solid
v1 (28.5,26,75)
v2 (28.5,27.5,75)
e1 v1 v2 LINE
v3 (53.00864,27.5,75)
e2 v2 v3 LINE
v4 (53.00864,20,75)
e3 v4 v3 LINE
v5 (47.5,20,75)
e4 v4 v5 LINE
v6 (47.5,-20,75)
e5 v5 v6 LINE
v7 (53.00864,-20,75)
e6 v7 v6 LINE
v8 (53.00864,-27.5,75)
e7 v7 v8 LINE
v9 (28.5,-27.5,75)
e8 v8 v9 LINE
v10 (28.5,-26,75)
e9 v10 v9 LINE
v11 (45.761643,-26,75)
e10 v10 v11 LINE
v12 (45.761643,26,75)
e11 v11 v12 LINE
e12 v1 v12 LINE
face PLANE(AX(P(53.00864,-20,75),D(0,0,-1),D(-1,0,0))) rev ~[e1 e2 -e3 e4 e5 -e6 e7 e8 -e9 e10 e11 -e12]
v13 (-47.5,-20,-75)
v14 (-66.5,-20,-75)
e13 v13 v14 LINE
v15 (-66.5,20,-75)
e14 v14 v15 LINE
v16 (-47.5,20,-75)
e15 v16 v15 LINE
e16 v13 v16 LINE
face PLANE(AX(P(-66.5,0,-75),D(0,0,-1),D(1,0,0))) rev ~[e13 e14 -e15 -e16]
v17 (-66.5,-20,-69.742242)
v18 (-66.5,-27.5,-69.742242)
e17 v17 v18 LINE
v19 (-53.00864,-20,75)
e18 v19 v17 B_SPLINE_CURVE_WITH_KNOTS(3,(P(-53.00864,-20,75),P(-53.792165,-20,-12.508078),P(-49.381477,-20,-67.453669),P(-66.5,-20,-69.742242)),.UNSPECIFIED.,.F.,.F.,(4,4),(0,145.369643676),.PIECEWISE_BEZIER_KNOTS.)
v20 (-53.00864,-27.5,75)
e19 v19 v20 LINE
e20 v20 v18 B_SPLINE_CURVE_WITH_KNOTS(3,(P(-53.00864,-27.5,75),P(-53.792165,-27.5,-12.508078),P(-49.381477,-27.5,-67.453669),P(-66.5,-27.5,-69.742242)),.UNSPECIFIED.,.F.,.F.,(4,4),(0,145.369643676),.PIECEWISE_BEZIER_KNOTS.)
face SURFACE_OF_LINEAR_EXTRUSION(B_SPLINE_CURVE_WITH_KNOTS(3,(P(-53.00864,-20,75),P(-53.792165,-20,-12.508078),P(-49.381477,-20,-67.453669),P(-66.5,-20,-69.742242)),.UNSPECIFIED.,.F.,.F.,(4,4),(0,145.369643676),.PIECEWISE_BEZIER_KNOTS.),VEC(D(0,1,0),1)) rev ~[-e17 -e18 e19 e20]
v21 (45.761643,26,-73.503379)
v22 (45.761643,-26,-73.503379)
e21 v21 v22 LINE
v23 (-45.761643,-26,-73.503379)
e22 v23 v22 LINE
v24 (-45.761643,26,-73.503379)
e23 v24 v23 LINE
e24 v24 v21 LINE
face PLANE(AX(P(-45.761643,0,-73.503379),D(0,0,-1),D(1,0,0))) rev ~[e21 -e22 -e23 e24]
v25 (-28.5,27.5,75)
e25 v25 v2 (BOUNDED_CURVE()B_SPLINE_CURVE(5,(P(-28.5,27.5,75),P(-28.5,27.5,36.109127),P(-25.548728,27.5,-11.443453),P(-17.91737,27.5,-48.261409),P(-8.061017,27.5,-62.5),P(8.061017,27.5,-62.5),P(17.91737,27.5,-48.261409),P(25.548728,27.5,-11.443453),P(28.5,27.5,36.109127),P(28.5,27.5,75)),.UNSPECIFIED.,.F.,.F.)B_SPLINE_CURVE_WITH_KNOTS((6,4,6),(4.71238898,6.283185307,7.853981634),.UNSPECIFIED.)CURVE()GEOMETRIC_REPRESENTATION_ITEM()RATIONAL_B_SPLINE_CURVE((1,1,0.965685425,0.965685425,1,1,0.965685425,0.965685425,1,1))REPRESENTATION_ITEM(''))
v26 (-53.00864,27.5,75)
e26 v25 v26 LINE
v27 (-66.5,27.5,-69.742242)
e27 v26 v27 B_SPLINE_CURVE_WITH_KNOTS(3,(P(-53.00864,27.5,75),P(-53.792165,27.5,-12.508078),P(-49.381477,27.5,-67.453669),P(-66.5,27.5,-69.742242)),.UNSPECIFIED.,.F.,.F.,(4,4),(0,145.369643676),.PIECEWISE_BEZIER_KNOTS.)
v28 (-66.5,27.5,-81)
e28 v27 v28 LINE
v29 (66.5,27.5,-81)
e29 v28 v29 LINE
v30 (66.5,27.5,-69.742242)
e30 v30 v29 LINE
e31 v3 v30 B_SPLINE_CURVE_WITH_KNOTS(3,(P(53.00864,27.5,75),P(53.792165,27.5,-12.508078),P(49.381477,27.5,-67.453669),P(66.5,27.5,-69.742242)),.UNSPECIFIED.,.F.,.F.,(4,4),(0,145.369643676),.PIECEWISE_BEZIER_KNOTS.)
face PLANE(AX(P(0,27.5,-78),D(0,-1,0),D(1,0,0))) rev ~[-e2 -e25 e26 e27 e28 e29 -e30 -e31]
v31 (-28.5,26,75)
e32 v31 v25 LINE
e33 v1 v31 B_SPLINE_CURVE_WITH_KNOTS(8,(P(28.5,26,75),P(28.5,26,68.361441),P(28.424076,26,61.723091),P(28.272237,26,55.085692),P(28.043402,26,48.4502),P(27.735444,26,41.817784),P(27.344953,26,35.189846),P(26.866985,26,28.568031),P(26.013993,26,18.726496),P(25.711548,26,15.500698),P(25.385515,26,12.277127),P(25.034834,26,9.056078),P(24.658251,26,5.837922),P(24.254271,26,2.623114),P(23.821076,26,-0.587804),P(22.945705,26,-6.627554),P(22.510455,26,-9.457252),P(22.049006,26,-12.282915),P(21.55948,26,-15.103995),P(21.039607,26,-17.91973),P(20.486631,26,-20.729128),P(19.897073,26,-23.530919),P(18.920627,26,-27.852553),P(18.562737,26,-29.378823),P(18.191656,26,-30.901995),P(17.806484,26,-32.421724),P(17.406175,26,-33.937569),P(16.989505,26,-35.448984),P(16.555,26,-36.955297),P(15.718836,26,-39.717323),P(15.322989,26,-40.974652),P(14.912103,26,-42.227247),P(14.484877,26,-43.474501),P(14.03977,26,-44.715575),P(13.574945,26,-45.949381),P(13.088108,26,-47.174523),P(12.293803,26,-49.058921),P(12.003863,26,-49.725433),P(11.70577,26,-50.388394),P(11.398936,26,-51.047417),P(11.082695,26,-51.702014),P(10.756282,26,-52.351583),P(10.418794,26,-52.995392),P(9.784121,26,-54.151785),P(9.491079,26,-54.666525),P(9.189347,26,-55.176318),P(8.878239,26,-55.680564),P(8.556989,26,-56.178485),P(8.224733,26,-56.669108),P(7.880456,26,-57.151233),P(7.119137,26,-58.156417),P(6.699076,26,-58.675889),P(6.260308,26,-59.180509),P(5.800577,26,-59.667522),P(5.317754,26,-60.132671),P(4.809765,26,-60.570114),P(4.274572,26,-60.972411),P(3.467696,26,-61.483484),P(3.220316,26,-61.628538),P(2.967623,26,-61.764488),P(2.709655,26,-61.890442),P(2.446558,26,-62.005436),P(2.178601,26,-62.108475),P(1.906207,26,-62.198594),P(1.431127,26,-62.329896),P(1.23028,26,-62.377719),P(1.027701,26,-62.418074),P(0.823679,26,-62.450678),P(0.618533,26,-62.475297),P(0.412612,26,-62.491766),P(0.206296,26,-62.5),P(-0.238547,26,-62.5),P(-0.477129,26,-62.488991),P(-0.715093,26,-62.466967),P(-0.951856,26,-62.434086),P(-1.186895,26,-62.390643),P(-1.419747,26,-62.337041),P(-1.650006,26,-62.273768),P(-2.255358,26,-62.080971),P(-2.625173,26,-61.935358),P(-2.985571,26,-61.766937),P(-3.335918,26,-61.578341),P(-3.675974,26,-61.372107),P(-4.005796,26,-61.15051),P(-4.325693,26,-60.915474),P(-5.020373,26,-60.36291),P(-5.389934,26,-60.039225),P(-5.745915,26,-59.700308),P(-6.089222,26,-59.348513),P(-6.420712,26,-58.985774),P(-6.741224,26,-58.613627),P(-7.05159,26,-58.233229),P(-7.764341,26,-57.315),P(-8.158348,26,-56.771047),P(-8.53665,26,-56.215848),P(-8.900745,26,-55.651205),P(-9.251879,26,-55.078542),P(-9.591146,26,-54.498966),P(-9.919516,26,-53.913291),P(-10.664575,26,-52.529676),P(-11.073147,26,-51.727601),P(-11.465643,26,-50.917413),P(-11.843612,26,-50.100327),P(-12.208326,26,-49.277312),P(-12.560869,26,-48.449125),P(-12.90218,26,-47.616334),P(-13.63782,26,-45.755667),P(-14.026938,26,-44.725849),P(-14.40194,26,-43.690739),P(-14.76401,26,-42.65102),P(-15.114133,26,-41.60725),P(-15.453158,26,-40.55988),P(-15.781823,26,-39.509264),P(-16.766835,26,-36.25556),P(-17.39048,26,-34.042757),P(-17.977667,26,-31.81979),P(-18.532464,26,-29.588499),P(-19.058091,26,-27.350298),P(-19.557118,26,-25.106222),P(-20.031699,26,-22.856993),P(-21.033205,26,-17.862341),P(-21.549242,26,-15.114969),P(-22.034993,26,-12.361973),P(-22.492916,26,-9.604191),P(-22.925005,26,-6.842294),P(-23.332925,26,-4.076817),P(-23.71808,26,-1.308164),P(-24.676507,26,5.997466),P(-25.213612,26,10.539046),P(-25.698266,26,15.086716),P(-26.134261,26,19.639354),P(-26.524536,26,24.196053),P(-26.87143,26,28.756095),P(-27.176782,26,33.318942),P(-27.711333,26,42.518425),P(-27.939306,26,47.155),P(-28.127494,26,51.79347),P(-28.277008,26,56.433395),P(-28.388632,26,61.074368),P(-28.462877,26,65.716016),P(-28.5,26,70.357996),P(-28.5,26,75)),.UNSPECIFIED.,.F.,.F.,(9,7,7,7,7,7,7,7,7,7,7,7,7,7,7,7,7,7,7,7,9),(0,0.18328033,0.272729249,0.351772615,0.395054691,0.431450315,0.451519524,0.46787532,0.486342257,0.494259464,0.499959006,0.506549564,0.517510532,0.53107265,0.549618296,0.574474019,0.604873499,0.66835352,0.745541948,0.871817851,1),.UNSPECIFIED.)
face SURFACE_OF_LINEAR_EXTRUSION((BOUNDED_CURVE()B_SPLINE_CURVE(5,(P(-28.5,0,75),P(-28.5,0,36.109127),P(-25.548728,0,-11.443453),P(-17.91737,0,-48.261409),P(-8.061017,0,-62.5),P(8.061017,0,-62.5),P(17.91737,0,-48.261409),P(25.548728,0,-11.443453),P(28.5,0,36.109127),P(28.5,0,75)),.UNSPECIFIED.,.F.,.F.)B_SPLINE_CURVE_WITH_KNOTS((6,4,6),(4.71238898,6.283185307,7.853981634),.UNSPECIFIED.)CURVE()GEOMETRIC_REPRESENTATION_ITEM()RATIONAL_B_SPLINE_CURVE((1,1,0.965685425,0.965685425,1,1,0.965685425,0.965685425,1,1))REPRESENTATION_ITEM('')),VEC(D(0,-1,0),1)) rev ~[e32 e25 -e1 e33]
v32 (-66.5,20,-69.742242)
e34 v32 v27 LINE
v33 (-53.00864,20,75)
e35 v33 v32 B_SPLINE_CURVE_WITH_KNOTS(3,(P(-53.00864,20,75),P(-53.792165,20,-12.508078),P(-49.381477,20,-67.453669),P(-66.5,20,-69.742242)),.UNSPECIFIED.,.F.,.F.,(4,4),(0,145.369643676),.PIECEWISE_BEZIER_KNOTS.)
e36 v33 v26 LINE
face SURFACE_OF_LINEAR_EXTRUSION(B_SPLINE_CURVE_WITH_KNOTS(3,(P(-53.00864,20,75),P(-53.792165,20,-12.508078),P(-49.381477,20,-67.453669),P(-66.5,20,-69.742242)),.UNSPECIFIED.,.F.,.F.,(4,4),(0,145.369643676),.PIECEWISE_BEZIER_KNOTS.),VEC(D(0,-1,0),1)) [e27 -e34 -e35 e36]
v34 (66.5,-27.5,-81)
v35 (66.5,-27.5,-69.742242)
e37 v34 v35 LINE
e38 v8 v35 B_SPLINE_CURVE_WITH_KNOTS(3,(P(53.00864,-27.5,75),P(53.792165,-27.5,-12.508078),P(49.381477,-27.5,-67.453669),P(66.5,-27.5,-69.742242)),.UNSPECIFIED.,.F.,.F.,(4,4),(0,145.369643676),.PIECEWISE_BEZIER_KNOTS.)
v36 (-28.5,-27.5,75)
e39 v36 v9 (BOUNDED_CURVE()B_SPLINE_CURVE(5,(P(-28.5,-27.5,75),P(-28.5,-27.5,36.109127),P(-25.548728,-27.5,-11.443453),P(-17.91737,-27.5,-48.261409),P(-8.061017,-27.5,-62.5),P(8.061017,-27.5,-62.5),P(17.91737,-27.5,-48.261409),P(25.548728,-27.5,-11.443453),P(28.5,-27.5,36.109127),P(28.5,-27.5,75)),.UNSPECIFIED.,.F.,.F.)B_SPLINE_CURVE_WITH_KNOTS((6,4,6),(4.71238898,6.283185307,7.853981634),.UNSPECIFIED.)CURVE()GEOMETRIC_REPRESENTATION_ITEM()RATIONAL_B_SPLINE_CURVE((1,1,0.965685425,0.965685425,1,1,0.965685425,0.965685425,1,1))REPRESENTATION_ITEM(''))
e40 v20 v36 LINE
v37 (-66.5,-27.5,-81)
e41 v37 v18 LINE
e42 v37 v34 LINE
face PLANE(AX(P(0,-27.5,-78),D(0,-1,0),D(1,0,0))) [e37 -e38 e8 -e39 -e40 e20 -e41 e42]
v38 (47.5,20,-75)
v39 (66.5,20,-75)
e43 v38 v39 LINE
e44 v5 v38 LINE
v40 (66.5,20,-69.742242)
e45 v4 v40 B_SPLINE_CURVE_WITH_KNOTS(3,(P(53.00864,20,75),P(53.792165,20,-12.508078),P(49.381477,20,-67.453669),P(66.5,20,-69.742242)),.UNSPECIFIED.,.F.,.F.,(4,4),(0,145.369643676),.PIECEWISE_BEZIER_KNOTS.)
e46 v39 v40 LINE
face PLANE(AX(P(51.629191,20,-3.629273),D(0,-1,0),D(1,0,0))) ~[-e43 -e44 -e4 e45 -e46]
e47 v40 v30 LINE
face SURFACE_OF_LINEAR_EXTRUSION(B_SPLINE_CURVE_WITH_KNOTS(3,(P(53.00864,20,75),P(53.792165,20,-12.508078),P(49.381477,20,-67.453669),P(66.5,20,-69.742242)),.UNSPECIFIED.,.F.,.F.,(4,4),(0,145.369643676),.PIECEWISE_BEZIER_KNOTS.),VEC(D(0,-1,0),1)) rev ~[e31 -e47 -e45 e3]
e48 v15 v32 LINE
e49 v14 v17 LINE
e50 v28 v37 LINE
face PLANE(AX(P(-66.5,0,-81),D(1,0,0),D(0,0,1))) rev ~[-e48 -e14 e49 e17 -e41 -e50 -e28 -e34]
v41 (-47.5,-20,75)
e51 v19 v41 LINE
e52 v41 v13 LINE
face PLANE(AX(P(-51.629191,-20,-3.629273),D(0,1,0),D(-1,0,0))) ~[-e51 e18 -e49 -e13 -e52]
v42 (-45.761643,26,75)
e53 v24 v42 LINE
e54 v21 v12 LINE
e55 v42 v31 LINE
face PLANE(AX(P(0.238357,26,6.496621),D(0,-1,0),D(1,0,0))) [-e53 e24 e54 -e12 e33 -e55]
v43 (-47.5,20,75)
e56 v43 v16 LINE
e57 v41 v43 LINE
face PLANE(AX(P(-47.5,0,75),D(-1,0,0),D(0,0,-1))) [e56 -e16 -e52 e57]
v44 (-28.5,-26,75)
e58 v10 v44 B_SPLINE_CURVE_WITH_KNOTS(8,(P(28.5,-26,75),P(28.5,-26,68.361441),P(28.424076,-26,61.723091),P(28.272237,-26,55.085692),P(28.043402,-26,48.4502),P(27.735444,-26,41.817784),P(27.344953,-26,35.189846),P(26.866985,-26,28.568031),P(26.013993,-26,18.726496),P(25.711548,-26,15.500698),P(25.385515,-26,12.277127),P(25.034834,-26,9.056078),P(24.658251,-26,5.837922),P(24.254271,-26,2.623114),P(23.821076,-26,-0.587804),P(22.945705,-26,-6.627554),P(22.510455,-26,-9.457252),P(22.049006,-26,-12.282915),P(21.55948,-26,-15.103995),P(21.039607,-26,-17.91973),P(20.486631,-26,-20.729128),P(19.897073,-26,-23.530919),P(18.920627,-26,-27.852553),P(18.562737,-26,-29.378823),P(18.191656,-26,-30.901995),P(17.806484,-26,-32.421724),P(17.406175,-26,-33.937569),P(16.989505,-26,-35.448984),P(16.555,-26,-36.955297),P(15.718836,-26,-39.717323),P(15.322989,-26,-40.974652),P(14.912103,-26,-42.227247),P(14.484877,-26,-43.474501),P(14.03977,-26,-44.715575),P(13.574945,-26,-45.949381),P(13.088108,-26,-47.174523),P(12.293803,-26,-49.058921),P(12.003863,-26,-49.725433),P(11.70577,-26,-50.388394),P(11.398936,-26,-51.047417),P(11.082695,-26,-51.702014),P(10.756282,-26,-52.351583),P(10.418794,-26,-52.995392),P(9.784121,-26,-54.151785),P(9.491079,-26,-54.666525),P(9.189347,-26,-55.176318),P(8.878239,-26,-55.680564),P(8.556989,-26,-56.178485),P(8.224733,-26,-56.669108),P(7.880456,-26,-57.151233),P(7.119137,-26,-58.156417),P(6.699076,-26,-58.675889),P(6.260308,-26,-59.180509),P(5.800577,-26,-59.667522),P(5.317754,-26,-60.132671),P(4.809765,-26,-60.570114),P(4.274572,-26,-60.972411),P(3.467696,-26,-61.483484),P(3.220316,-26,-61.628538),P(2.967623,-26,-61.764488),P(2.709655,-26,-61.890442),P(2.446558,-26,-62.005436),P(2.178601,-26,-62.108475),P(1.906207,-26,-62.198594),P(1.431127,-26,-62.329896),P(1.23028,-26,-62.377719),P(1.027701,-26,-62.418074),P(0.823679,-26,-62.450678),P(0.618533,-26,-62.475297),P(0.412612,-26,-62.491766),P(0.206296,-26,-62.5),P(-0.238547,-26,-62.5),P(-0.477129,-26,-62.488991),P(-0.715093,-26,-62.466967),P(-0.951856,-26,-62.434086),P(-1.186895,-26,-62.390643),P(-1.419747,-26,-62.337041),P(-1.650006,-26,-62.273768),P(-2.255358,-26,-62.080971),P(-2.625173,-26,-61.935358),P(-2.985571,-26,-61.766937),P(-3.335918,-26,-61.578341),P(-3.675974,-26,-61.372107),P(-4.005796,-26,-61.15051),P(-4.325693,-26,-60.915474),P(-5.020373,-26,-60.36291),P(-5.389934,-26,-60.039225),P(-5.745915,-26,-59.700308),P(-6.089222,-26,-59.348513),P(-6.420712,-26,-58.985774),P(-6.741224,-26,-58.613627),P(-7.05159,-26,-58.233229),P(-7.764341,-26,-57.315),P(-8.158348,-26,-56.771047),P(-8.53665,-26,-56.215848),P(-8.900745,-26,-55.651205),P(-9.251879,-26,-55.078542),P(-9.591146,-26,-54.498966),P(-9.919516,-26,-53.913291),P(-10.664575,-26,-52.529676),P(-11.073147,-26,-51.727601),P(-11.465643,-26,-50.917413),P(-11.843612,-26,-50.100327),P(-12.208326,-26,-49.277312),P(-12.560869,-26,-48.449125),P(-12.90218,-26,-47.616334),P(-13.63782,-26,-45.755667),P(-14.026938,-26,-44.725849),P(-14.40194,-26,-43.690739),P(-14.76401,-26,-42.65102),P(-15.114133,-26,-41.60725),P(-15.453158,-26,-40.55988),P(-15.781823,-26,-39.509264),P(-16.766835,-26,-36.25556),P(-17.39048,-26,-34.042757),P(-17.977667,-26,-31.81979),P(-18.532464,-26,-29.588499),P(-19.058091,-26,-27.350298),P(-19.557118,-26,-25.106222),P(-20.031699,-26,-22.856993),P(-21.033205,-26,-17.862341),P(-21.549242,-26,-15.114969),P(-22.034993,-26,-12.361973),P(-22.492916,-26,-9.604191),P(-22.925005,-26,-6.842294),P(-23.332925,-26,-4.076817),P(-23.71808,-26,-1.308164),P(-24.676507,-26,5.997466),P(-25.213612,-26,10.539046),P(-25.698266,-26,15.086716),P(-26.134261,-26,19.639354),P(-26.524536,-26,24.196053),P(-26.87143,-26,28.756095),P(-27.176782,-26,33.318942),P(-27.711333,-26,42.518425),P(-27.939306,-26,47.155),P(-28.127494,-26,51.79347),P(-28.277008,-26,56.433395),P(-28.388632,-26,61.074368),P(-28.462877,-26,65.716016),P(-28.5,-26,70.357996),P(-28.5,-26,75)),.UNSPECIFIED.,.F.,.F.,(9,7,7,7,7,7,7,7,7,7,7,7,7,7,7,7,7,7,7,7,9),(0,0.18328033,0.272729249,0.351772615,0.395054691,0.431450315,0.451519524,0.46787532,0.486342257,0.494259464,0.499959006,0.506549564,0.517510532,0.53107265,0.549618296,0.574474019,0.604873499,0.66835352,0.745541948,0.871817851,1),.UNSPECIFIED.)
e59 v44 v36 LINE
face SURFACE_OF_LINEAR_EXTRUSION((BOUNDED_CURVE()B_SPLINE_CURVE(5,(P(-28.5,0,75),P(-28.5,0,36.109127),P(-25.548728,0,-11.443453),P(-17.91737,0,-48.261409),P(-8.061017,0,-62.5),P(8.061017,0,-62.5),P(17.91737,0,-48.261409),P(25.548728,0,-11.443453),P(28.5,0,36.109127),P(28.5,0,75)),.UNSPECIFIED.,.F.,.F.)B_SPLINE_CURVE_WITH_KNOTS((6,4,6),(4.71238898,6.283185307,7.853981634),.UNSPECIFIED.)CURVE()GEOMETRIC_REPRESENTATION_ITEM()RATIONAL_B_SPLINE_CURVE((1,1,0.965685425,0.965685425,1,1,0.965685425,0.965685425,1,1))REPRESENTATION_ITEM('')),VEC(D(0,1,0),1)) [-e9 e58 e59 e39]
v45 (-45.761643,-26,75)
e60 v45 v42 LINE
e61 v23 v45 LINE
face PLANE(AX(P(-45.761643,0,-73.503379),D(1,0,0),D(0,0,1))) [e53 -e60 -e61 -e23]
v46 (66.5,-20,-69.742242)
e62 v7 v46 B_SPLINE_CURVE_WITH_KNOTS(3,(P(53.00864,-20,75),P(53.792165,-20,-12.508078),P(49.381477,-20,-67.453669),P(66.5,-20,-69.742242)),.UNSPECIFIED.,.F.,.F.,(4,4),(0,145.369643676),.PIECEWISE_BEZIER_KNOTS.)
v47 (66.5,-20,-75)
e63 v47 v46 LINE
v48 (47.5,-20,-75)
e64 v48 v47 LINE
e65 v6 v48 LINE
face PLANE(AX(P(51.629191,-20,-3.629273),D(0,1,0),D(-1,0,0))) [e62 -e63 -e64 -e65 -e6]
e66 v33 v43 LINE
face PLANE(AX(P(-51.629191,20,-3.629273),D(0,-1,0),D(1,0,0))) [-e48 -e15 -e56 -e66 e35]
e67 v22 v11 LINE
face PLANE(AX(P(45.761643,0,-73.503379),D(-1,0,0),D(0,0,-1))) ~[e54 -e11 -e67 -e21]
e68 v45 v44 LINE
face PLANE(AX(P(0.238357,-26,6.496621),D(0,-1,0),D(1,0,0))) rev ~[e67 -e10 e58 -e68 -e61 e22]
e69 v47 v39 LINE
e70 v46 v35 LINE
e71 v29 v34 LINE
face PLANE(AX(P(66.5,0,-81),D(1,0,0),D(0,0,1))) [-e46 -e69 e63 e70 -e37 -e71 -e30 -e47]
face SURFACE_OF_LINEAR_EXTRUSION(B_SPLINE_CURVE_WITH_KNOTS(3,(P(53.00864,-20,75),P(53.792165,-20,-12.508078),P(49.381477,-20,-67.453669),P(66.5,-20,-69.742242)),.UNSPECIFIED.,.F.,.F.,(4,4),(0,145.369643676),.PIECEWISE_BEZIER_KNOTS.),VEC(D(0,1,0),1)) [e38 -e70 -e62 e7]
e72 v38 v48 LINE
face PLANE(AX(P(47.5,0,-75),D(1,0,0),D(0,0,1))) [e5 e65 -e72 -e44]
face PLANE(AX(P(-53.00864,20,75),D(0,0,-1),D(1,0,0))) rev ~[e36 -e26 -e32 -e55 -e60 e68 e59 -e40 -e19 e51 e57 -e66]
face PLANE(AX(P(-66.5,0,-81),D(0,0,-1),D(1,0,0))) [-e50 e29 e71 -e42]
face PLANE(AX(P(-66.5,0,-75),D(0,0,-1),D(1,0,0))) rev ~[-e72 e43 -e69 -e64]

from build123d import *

# Parameters (mm, degrees)
F1_DEPTH = 27.5
F2_W     = 92
F2_H     = 160
F3_DEPTH = 26
F5_START = 20
F5_DEPTH = 7.5
F8_W     = 133
F8_H     = 6
F9_DEPTH = 27.5


# Not quite as in the source:
# - a feature names something its author has since deleted; it is built from what else it names


with BuildPart() as f1:
    # F0 (on Front) → F1 (new body, symmetric)
    with BuildSketch(Plane.XZ):
        with BuildLine():
            Line((-47.5, -75), (47.5, -75))
            Line((47.5, -75), (47.5, 75))
            Line((47.5, 75), (28.5, 75))
            add(Edge.make_bspline(
                [(0, -62.5), (28.5, -62.5), (28.5, 75)],
                knots=[0, 0, 0, 1.5707963268, 1.5707963268, 1.5707963268], degree=2, weights=[1, 0.7071067812, 1]))
            add(Edge.make_bspline(
                [(-28.5, 75), (-28.5, -62.5), (0, -62.5)],
                knots=[4.7123889804, 4.7123889804, 4.7123889804, 6.2831853072, 6.2831853072, 6.2831853072], degree=2, weights=[1, 0.7071067812, 1]))
            Line((-28.5, 75), (-47.5, 75))
            Line((-47.5, 75), (-47.5, -75))
        make_face()
    extrude(amount=F1_DEPTH, both=True)

    # F2 (on Front) → F3 (cut, symmetric)
    with BuildSketch(Plane.XZ):
        with Locations((0.2383571118, 6.4966206347)):
            Rectangle(F2_W, F2_H)
    extrude(amount=F3_DEPTH, both=True, mode=Mode.SUBTRACT)

    # F4 (on Front) → F5 (join)
    with BuildSketch(Plane.XZ.offset(F5_START)):
        with BuildLine():
            add(Edge.make_bspline(
                [(53.0086401116, 75), (53.7921645124, -12.5080782441), (49.3814773033, -67.453669192), (66.5, -69.7422416255)],
                knots=[0, 0, 0, 0, 145.3696436758, 145.3696436758, 145.3696436758, 145.3696436758], degree=3))
            Line((53.0086401116, 75), (47.5, 75))
            Line((47.5, 75), (47.5, -75))
            Line((47.5, -75), (66.5, -75))
            Line((66.5, -75), (66.5, -69.7422416255))
        make_face()
    extrude(amount=F5_DEPTH)

    # F6: F1 across plane


with BuildPart() as f1_1:
    add(f1.part)
    add(f1.part.mirror(Plane.YZ))

    # F7: F1 across plane


with BuildPart() as f1_2:
    add(f1_1.part)
    add(f1_1.part.mirror(Plane.XZ))

    # F8 (on Front) → F9 (join, symmetric)
    with BuildSketch(Plane.XZ):
        with Locations((0, -78)):
            Rectangle(F8_W, F8_H)
    extrude(amount=F9_DEPTH, both=True)


solid = f1_2.part
